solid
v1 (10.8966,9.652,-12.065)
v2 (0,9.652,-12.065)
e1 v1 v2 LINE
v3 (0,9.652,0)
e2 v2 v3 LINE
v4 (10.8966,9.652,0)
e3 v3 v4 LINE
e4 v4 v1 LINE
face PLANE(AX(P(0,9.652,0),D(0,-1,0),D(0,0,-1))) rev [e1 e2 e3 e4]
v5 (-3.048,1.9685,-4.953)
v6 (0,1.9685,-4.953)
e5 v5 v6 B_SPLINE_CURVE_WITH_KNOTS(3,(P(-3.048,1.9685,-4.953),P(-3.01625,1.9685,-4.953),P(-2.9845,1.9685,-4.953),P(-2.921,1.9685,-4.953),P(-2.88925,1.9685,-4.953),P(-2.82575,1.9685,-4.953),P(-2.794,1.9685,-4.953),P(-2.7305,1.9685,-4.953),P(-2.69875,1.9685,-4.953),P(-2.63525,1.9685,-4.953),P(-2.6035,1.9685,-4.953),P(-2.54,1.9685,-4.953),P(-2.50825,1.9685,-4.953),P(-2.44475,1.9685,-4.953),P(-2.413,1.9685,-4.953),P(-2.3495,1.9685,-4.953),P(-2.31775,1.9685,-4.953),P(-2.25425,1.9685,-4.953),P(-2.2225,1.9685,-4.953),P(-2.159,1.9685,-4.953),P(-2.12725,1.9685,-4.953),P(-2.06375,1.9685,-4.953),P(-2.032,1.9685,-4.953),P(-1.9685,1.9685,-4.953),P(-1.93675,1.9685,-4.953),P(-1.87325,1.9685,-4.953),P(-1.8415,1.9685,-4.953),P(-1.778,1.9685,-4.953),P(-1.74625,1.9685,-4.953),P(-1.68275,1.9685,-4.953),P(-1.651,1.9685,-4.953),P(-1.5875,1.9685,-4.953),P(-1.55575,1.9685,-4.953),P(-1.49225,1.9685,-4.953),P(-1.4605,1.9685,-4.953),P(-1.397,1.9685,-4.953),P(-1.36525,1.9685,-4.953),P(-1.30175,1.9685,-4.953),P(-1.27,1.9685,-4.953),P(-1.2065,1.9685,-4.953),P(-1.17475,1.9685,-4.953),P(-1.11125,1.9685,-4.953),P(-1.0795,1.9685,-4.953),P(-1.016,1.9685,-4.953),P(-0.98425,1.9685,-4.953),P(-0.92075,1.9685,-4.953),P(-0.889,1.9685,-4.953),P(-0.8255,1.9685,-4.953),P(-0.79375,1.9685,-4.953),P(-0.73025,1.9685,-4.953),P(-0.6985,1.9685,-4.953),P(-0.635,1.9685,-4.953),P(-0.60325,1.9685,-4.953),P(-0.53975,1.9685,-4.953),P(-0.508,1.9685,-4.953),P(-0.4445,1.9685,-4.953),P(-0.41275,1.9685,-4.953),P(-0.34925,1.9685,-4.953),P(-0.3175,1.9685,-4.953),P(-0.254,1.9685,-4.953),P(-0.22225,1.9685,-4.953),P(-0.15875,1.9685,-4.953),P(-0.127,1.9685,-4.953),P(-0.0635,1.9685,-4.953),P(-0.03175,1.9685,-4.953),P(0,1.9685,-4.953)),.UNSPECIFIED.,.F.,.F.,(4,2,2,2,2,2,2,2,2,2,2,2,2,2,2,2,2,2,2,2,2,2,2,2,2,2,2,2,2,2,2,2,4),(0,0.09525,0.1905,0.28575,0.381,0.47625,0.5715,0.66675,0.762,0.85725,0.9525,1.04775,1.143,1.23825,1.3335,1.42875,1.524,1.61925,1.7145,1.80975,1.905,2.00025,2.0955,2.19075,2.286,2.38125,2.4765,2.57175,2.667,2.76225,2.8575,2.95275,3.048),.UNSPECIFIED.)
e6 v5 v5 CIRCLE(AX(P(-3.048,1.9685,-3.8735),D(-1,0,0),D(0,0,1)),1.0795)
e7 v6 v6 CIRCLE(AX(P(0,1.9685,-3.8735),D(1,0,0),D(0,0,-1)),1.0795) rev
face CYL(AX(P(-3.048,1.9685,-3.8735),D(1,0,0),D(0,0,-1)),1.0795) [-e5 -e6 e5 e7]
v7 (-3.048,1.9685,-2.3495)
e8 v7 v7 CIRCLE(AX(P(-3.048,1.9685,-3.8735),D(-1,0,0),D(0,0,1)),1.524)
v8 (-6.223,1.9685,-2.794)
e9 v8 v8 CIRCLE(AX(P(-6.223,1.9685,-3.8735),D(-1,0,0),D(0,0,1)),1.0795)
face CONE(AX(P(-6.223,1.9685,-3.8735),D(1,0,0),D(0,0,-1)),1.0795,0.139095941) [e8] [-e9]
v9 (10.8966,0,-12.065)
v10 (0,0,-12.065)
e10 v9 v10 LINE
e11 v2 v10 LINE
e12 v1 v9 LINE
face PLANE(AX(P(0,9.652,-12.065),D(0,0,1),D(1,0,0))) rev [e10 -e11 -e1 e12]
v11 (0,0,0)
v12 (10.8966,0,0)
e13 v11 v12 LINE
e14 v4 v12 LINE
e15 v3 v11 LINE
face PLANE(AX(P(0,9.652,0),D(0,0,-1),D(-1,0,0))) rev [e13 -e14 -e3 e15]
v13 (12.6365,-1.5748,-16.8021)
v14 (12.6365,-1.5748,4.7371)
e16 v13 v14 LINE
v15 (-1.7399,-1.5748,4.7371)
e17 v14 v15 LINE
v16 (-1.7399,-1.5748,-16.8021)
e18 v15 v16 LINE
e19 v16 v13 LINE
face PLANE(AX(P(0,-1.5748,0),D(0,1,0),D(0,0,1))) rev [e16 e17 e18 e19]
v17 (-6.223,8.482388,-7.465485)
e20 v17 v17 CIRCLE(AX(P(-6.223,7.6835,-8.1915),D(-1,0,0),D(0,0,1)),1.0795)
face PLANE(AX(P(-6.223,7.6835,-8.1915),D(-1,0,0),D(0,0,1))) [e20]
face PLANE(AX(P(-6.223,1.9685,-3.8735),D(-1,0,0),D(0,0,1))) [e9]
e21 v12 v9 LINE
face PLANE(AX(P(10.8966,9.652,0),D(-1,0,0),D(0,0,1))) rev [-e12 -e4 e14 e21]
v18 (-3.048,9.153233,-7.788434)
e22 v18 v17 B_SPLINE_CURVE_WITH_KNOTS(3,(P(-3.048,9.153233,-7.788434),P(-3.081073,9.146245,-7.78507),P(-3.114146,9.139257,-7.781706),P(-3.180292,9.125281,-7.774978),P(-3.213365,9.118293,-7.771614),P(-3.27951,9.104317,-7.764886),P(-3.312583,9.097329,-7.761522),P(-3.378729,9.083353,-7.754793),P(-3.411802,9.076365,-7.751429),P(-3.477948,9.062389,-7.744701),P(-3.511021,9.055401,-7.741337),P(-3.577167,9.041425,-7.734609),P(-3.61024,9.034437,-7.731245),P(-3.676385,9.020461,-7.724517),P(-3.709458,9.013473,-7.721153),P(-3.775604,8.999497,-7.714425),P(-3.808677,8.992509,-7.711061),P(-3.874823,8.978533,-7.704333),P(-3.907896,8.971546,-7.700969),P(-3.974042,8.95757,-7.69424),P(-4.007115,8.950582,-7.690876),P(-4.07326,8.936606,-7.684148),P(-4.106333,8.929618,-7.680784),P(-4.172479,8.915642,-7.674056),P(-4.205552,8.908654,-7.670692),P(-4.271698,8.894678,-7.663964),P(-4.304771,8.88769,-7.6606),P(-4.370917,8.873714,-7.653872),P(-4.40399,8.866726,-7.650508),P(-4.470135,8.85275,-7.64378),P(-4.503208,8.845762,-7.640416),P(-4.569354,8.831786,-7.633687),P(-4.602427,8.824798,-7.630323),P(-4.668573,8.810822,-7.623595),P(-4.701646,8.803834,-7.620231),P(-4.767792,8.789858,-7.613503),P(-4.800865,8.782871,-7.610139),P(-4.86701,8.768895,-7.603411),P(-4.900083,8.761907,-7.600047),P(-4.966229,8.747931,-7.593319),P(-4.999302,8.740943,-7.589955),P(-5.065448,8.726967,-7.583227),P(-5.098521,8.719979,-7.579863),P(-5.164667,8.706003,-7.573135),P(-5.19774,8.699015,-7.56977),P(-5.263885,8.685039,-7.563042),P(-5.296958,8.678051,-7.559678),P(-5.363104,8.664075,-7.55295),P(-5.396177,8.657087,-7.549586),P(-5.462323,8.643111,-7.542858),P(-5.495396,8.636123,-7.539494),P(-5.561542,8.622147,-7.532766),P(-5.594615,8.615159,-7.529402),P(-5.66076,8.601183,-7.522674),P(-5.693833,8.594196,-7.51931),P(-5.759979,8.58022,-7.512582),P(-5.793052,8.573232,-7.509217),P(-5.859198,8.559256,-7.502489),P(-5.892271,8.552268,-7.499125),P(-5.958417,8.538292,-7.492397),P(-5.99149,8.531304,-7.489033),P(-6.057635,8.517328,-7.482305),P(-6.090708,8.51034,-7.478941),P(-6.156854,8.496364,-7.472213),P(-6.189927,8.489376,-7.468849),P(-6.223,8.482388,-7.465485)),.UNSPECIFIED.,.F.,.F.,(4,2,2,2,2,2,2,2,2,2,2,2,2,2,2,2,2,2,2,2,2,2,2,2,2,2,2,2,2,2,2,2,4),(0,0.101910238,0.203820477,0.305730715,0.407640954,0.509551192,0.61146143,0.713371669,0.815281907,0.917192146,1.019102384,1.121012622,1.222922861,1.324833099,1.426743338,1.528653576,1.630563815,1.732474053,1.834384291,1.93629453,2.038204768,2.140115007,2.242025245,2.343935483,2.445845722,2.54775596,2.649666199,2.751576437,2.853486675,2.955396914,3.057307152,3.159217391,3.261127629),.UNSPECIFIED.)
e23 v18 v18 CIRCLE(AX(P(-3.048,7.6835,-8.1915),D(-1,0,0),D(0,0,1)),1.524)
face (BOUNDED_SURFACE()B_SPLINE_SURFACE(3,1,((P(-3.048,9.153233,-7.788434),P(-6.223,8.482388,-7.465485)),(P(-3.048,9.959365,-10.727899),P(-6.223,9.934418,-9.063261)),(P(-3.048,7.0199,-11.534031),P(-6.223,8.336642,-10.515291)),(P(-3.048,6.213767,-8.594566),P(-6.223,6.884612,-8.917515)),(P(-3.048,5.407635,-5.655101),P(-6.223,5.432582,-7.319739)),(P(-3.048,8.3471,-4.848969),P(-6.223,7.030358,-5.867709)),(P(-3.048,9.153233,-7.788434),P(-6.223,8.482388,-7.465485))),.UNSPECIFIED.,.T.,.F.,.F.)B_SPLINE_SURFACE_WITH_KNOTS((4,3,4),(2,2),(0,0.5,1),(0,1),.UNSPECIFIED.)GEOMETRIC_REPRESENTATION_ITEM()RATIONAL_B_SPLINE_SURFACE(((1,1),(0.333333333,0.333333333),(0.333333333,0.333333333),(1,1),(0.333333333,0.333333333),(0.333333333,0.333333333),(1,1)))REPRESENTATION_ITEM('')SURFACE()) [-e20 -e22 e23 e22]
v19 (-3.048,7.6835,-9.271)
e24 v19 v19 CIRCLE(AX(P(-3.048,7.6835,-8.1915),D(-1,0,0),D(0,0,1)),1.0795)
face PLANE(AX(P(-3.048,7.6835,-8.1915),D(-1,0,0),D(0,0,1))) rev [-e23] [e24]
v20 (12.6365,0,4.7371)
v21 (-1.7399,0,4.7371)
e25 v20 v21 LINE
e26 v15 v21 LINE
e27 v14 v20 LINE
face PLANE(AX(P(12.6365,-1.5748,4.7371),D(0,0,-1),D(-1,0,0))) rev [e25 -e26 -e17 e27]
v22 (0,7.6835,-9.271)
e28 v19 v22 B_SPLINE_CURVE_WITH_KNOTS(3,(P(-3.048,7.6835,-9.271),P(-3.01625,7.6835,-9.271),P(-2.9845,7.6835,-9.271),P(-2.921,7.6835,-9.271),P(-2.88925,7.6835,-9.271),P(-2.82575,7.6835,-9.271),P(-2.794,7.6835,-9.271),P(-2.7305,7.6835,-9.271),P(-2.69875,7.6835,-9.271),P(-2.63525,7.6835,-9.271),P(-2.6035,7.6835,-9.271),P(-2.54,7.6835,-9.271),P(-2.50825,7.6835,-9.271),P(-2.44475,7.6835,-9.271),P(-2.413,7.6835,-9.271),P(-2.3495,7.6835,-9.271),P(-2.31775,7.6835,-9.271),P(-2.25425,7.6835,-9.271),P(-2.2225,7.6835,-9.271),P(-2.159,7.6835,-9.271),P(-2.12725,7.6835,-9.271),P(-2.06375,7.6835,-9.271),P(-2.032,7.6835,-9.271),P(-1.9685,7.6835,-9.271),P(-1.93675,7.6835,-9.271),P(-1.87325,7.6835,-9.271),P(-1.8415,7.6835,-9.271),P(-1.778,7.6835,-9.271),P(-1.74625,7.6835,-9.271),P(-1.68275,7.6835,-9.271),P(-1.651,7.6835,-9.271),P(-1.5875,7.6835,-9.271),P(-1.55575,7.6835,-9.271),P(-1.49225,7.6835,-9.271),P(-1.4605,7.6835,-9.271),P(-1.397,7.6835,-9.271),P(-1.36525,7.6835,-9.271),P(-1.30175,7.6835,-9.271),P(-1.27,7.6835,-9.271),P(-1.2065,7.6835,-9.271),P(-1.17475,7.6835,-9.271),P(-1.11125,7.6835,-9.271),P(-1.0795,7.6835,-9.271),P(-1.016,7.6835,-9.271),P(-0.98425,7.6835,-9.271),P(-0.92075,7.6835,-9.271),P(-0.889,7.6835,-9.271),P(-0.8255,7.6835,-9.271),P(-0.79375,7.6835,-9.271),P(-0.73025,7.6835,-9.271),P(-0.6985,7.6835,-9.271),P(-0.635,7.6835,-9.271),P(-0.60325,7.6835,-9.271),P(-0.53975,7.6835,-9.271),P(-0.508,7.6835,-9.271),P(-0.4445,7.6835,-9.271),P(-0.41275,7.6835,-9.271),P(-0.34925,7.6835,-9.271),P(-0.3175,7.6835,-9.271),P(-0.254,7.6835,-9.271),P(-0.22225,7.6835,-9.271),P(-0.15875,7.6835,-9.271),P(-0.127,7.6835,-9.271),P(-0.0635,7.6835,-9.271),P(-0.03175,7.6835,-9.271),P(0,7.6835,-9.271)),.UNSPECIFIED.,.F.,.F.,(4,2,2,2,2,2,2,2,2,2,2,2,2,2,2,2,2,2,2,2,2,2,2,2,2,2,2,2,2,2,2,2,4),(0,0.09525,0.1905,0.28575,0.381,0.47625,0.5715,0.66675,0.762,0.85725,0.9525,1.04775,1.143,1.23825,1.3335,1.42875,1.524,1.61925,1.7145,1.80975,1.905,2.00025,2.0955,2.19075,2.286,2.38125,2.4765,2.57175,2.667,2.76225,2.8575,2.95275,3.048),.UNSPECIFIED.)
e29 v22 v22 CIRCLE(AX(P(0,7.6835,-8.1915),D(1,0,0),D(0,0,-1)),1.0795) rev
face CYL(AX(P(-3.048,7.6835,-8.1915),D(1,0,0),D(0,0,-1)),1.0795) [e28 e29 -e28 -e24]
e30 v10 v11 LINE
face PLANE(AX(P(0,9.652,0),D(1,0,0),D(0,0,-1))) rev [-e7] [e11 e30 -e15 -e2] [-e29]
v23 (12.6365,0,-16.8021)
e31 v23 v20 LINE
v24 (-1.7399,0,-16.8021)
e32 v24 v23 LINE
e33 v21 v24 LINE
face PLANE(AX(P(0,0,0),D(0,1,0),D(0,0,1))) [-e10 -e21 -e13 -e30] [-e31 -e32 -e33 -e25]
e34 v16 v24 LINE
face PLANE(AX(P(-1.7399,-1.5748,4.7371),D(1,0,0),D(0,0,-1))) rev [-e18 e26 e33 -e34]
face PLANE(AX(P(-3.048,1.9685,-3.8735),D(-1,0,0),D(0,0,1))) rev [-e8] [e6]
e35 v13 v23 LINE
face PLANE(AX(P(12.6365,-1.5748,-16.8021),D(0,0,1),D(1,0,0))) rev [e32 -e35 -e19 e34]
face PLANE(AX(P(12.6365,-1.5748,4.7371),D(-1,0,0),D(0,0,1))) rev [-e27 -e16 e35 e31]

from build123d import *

# Parameters (mm, degrees)
SKETCH1_W           = 10.8966
SKETCH1_H           = 12.065
BOSS_EXTRUDE1_DEPTH = 9.652
SKETCH2_R           = 1.0795
BOSS_EXTRUDE2_DEPTH = 3.048
SKETCH6_R           = 1.524
SKETCH7_R           = 1.0795
SKETCH8_W           = 14.3764
SKETCH8_H           = 21.5392
BOSS_EXTRUDE3_DEPTH = 1.5748


with BuildPart() as part:
    # Sketch1 → Boss-Extrude1 (new body)
    with BuildSketch(Plane(origin=(0, 0, 0), x_dir=(1, 0, 0), z_dir=(0, 1, 0))):
        with Locations((5.4483, 6.0325)):
            Rectangle(SKETCH1_W, SKETCH1_H)
    extrude(amount=BOSS_EXTRUDE1_DEPTH)

    # Sketch2 → Boss-Extrude2 (add)
    with BuildSketch(Plane.ZY):
        with Locations(Location((-8.1915, 7.6835, 0), (0, 0, 180))):
            Circle(SKETCH2_R)
        with Locations(Location((-3.8735, 1.9685, 0), (0, 0, 180))):
            Circle(SKETCH2_R)
    extrude(amount=BOSS_EXTRUDE2_DEPTH)

    # Loft1: read off the stored shape, not the designer's step
    # Loft1: loft between two sections, ruled curve by curve
    loft1_from = [
        Edge.make_bspline([(-3.048, 9.153232542, -7.788433932), (-3.048, 9.959364678, -10.727899016), (-3.048, 7.019899594, -11.534031152), (-3.048, 6.213767458, -8.594566068), (-3.048, 5.407635322, -5.655100984), (-3.048, 8.347100406, -4.848968848), (-3.048, 9.153232542, -7.788433932)], [0, 0, 0, 0, 0.5, 0.5, 0.5, 1, 1, 1, 1], 3, [1, 0.333333333, 0.333333333, 1, 0.333333333, 0.333333333, 1]),
    ]
    loft1_to = [
        Edge.make_bspline([(-6.223, 8.482388093, -7.465484805), (-6.223, 9.934418484, -9.063260992), (-6.223, 8.336642297, -10.515291382), (-6.223, 6.884611907, -8.917515195), (-6.223, 5.432581516, -7.319739008), (-6.223, 7.030357703, -5.867708618), (-6.223, 8.482388093, -7.465484805)], [0, 0, 0, 0, 0.5, 0.5, 0.5, 1, 1, 1, 1], 3, [1, 0.333333333, 0.333333333, 1, 0.333333333, 0.333333333, 1]),
    ]
    loft1 = Solid(Shell([*[Face.make_surface_from_curves(loft1_from[k], loft1_to[k]) for k in range(1)], Face(Wire(loft1_from)), Face(Wire(loft1_to))]))
    add(loft1)

    # Sketch6 → Loft2 section 0
    with BuildSketch(Plane.ZY.offset(3.048)):
        with Locations((-3.8735, 1.9685)):
            Circle(SKETCH6_R)
    # Sketch7 → Loft2 section 1
    with BuildSketch(Plane.ZY.offset(6.223)):
        with Locations((-3.8735, 1.9685)):
            Circle(SKETCH7_R)
    loft()

    # Sketch8 → Boss-Extrude3 (add)
    with BuildSketch(Plane.XZ):
        with Locations((5.4483, -6.0325)):
            Rectangle(SKETCH8_W, SKETCH8_H)
    extrude(amount=BOSS_EXTRUDE3_DEPTH)


solid = part.part
